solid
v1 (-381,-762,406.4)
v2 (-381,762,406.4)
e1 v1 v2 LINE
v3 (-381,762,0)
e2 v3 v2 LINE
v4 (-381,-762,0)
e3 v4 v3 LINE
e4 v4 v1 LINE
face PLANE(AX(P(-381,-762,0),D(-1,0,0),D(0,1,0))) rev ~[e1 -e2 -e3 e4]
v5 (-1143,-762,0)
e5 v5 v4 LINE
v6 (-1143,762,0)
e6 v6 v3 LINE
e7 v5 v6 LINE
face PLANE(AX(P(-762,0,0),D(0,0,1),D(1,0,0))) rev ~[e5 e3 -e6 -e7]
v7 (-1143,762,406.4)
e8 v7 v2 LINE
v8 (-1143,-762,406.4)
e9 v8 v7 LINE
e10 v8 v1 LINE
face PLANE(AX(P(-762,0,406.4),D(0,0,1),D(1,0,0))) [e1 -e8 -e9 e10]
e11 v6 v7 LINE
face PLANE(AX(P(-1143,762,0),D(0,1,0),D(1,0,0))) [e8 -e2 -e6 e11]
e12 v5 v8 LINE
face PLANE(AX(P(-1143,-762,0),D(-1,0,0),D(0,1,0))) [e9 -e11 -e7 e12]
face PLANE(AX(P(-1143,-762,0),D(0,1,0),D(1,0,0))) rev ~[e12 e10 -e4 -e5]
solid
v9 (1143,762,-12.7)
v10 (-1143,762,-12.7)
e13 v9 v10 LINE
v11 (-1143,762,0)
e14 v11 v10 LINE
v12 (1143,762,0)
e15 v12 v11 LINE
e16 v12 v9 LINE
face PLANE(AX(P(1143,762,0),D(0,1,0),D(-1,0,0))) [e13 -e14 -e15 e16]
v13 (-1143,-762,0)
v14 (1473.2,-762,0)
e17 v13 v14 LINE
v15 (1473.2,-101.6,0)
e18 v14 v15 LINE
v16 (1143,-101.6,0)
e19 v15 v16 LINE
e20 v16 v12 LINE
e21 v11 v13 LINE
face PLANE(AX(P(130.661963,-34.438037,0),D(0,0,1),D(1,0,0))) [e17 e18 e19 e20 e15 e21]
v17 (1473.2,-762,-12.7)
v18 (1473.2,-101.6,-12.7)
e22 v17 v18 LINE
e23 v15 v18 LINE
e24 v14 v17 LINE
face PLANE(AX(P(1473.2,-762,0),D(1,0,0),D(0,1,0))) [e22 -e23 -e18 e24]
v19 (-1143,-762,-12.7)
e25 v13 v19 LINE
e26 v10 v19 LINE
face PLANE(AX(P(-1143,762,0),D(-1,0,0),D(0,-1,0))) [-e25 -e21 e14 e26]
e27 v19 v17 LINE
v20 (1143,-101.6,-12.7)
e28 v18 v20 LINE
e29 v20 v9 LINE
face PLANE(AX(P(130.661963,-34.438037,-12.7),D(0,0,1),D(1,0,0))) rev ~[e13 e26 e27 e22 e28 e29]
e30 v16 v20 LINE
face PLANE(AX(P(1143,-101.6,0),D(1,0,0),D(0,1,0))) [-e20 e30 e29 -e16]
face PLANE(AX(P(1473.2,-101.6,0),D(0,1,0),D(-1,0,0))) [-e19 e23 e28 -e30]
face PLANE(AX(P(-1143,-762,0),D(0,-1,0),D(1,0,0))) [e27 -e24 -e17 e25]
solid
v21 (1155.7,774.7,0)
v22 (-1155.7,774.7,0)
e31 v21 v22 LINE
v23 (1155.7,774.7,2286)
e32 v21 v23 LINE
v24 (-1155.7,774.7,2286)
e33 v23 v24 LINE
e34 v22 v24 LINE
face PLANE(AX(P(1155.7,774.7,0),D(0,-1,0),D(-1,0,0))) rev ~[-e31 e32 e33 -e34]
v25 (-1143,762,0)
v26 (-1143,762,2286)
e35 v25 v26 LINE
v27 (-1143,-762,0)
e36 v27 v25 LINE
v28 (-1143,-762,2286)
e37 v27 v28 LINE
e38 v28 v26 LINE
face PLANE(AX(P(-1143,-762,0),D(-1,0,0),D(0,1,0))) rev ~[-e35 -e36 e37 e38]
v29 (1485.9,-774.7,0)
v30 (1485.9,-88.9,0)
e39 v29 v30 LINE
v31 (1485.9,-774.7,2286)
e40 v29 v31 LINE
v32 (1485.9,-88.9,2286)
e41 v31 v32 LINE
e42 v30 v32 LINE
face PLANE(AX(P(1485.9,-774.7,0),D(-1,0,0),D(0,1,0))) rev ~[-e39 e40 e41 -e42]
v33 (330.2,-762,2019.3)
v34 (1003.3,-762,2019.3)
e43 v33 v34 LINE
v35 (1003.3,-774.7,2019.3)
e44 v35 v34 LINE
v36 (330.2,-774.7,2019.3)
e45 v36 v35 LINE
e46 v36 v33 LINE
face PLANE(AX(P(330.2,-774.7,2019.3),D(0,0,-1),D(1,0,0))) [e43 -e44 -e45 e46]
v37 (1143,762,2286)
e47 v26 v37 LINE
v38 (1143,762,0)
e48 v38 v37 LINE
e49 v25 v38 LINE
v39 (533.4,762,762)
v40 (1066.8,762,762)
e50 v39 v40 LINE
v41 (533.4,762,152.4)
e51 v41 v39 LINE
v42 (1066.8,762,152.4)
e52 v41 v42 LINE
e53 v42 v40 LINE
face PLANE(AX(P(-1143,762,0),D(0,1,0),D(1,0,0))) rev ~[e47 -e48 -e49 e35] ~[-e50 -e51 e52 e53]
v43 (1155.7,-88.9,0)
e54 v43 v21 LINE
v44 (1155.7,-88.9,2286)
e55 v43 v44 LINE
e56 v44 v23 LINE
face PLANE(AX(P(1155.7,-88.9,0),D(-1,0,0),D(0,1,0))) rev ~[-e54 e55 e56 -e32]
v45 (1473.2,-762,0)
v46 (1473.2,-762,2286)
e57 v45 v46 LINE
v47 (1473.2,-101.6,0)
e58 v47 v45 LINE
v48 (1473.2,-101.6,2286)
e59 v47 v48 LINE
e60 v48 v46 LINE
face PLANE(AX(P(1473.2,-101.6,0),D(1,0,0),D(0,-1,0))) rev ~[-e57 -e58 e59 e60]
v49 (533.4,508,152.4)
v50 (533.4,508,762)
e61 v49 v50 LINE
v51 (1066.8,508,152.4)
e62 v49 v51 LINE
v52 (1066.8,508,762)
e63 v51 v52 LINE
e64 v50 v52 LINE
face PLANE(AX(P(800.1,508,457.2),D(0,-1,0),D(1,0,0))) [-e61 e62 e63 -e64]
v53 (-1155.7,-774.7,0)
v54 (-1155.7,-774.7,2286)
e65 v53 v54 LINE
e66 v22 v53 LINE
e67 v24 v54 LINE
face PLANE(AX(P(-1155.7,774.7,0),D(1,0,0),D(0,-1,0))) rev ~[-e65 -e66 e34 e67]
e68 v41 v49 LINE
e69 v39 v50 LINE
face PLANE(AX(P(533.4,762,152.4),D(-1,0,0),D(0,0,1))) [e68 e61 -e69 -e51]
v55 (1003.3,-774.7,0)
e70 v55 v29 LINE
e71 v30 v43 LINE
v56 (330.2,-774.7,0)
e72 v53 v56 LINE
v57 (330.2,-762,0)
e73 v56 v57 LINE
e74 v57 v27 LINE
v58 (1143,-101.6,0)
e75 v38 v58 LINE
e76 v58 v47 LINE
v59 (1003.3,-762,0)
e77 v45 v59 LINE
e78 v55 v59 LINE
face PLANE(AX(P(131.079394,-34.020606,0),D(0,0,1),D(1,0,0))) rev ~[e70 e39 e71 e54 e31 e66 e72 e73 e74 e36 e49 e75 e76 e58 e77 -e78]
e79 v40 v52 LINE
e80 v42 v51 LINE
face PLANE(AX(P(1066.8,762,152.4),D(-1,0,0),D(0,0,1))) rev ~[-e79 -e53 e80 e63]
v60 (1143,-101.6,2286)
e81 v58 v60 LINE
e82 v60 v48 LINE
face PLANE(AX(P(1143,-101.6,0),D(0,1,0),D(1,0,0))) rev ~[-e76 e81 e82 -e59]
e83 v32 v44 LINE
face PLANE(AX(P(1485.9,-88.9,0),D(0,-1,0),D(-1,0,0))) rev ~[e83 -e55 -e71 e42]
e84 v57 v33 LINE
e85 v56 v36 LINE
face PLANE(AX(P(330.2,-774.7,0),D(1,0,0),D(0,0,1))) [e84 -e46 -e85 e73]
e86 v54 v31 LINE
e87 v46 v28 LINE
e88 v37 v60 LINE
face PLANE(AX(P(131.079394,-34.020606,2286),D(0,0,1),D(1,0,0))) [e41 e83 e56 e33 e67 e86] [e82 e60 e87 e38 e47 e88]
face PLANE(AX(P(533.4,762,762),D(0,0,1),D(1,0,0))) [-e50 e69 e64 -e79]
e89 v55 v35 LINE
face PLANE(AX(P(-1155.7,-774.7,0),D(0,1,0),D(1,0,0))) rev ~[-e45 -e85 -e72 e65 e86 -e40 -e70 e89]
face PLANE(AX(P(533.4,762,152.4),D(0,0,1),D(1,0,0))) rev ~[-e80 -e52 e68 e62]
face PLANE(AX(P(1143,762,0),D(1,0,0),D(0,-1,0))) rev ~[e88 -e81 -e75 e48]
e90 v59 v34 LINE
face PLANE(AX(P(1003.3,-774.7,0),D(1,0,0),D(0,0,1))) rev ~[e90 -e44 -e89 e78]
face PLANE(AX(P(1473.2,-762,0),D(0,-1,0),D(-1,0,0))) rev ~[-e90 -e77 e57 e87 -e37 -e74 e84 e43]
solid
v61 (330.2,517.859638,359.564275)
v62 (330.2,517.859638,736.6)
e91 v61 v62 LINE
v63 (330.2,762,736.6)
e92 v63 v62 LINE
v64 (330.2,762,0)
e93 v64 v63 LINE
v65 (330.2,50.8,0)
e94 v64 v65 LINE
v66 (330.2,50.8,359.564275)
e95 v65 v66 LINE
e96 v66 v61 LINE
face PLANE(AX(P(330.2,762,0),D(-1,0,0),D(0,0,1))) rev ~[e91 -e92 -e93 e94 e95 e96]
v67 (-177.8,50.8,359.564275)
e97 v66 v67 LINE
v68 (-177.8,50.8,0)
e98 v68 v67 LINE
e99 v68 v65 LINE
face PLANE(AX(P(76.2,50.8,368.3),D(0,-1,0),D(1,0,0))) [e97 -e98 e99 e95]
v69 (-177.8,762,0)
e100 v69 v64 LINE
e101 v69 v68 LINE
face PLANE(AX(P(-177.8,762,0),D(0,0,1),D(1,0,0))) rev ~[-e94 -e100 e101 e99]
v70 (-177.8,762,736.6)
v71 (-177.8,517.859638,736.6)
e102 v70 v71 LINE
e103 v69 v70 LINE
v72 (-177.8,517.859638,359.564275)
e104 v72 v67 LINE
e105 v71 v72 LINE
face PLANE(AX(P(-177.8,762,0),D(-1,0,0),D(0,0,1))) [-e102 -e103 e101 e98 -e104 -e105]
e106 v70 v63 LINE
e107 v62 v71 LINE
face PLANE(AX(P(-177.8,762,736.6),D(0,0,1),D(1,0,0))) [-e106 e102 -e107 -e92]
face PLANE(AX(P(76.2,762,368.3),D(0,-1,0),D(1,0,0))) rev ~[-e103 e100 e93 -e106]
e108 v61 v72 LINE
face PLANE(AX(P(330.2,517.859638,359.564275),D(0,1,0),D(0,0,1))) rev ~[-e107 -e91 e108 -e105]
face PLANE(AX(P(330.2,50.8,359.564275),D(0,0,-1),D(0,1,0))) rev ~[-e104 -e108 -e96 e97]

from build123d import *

# Parameters (mm, degrees)
F1_DEPTH  = 12.7
F3_DEPTH  = 2286
F4_W      = 673.1
F4_H      = 2019.3
F5_DEPTH  = 25.4
F6_W      = 762
F6_H      = 1524
F8_DEPTH  = 406.4
F9_W      = 508
F9_H      = 736.6
F10_DEPTH = 711.2
F9_W_2    = 533.4
F9_H_2    = 609.6
F11_DEPTH = 254
F12_W     = 467.0596377373
F12_H     = 377.0357254505
F13_DEPTH = 762


with BuildPart() as f1:
    # F0 (on Top) → F1 (new body)
    with BuildSketch(Plane.XY):
        Polygon((-1143, -762), (1143, -762), (1473.2, -762), (1473.2, -101.6), (1143, -101.6), (1143, 762), (-1143, 762), align=None)
    extrude(amount=-F1_DEPTH)


with BuildPart() as f3:
    # F2 (on face) → F3 (new body)
    with BuildSketch(Plane.XY):
        Polygon((-1155.7, -774.7), (1485.9, -774.7), (1485.9, -88.9), (1155.7, -88.9), (1155.7, 774.7), (-1155.7, 774.7), align=None)
        Polygon((1473.2, -762), (-1143, -762), (-1143, 762), (1143, 762), (1143, -101.6), (1473.2, -101.6), align=None, mode=Mode.SUBTRACT)
    extrude(amount=F3_DEPTH)

    # F4 (on face) → F5 (cut)
    with BuildSketch(Plane.XZ.offset(774.7)):
        with Locations((666.75, 1009.65)):
            Rectangle(F4_W, F4_H)
    extrude(amount=-F5_DEPTH, mode=Mode.SUBTRACT)

    # F9 (on face) → F11 (join)
    with BuildSketch(Plane.XZ.offset(-762)):
        with Locations((800.1, 457.2)):
            Rectangle(F9_W_2, F9_H_2)
    extrude(amount=F11_DEPTH)


with BuildPart() as f8:
    # F6 (on face) → F8 (new body)
    with BuildSketch(Plane.XY):
        with Locations((-762, 0)):
            Rectangle(F6_W, F6_H)
    extrude(amount=F8_DEPTH)


with BuildPart() as f10:
    # F9 (on face) → F10 (new body)
    with BuildSketch(Plane.XZ.offset(-762)):
        with Locations((76.2, 368.3)):
            Rectangle(F9_W, F9_H)
    extrude(amount=F10_DEPTH)

    # F12 (on face) → F13 (cut)
    with BuildSketch(Plane.YZ.offset(330.2)):
        with Locations((284.3298188686, 548.0821372747)):
            Rectangle(F12_W, F12_H)
    extrude(amount=-F13_DEPTH, mode=Mode.SUBTRACT)


solid = Compound([f1.part, f3.part, f8.part, f10.part])
